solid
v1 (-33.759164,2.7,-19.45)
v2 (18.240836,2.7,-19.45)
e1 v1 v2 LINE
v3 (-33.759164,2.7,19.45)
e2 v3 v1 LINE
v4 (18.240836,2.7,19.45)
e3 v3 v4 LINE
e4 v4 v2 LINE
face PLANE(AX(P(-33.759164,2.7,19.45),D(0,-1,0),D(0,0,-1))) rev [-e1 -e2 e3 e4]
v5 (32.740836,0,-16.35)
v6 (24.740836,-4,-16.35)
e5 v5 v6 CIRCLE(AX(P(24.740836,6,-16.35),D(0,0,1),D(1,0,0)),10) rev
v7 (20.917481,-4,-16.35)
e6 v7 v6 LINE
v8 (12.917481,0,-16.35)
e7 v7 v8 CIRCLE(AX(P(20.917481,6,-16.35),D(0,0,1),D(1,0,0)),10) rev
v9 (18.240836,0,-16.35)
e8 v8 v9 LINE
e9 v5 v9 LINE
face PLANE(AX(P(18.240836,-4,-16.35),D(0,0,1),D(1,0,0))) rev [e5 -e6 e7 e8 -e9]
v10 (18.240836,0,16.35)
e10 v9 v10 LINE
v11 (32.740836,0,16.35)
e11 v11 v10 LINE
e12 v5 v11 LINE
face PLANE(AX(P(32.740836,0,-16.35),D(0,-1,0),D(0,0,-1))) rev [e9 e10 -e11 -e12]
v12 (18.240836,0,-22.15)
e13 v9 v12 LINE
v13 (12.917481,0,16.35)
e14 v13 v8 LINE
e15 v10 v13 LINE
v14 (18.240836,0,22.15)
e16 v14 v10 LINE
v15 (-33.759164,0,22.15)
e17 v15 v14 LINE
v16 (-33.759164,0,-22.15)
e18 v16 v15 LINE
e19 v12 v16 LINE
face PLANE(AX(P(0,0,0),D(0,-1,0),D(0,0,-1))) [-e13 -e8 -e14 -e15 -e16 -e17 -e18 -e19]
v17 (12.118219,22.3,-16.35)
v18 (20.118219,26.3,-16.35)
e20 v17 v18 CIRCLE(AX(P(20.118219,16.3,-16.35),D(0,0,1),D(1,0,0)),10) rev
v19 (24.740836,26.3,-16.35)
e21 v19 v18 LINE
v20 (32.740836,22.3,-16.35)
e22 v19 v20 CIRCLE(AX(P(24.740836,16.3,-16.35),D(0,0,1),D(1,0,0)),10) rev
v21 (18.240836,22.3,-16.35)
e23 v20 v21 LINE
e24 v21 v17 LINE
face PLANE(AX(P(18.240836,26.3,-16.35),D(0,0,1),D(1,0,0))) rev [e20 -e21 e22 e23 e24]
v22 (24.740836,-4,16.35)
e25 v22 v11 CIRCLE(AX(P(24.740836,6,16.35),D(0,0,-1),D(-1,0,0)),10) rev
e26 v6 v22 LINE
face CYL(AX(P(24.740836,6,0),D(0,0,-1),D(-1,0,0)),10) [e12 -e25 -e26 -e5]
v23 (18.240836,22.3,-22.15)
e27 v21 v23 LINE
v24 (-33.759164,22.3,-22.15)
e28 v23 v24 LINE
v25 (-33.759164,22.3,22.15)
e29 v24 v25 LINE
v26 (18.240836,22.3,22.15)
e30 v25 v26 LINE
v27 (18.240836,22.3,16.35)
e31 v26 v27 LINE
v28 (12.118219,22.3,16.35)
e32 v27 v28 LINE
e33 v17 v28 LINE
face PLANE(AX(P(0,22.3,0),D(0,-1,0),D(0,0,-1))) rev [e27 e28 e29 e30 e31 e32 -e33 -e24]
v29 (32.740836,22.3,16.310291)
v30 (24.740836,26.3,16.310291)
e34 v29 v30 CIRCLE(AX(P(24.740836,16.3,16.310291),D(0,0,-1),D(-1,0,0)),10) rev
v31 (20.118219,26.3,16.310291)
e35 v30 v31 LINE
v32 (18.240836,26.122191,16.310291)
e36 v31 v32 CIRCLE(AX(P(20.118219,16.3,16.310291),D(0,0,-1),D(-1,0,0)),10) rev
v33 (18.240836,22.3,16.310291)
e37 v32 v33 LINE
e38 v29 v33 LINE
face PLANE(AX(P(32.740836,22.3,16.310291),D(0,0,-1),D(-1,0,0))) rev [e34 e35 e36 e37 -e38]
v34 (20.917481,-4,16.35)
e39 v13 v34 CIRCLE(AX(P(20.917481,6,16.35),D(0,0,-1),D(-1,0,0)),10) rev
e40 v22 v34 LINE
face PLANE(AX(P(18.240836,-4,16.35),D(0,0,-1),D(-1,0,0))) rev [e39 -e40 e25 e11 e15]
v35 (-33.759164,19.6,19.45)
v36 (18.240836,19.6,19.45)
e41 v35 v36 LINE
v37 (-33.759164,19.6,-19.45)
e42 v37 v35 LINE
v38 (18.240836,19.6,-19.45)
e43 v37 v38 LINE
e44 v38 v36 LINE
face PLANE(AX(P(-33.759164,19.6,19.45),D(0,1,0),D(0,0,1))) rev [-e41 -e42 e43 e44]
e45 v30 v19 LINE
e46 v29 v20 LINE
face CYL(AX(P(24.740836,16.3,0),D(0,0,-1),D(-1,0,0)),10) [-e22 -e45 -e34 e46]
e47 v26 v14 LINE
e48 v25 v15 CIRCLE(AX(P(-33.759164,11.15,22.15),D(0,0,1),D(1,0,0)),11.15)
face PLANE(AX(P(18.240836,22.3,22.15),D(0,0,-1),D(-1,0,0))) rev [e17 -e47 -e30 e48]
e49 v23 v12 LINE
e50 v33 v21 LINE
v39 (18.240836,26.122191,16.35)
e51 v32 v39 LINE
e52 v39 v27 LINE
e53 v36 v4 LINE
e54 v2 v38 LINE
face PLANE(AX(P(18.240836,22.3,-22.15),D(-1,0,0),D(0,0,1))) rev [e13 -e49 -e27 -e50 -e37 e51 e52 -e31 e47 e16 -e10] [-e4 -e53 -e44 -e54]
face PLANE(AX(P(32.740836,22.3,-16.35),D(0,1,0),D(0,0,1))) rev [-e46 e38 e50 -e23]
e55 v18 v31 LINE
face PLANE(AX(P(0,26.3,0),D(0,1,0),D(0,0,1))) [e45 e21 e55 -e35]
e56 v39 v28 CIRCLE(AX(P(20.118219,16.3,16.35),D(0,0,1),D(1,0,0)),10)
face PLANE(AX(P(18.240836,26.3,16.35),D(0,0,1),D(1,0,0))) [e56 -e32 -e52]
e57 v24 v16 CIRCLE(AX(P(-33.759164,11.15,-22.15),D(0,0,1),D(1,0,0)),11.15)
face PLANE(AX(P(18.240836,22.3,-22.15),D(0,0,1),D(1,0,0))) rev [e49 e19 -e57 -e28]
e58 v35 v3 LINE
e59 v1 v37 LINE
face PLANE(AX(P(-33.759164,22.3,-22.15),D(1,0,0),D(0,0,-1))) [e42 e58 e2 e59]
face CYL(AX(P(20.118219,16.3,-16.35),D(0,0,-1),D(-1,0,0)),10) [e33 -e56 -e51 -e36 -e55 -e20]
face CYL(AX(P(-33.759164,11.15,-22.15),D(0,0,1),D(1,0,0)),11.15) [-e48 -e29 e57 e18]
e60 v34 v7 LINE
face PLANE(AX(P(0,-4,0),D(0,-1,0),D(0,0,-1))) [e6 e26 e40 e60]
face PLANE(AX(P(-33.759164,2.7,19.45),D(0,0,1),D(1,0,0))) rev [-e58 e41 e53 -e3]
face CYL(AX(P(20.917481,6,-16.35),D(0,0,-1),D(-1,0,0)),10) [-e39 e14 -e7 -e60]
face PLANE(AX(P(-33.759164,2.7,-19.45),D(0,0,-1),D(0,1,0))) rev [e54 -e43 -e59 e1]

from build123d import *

# Parameters (mm, degrees)
ESQUISSE1_W             = 52
ESQUISSE1_H             = 44.3
BOSS_EXTRU_1_DEPTH      = 22.3
ESQUISSE4_W             = 38.9
ESQUISSE4_H             = 16.9
ENL_V_MAT_EXTRU_2_DEPTH = 52
BOSS_EXTRU_3_DEPTH      = 44.3
ESQUISSE9_W             = 5.32335475
ESQUISSE9_H             = 32.7
BOSS_EXTRU_4_DEPTH      = 4
ESQUISSE10_W            = 32.7
ESQUISSE10_H            = 4
BOSS_EXTRU_5_DEPTH      = 14.5
ESQUISSE11_W            = 6.122616958
ESQUISSE11_H            = 32.7
BOSS_EXTRU_6_DEPTH      = 4
ESQUISSE12_W            = 32.660291113
ESQUISSE12_H            = 4
BOSS_EXTRU_7_DEPTH      = 14.5
CONG_1_R                = 10
CONG_2_R                = 10
CONG_3_R                = 10
CONG_4_R                = 10


with BuildPart() as part:
    # Esquisse1 → Boss.-Extru.1 (new body)
    with BuildSketch(Plane(origin=(0, 0, 0), x_dir=(1, 0, 0), z_dir=(0, 1, 0))):
        with Locations((-7.759163987, 0)):
            Rectangle(ESQUISSE1_W, ESQUISSE1_H)
    extrude(amount=BOSS_EXTRU_1_DEPTH)

    # Esquisse4 → Enlèv. mat.-Extru.2 (cut)
    with BuildSketch(Plane(origin=(18.240836013, 0, 0), x_dir=(0, 0, -1), z_dir=(1, 0, 0))):
        with Locations((0, 11.15)):
            Rectangle(ESQUISSE4_W, ESQUISSE4_H)
    extrude(amount=-ENL_V_MAT_EXTRU_2_DEPTH, mode=Mode.SUBTRACT)

    # Esquisse5 → Boss.-Extru.3 (add)
    with BuildSketch(Plane.XY.offset(22.15)):
        with BuildLine():
            Line((-33.759163987, 22.3), (-33.759163987, 0))
            ThreePointArc((-33.759163987, 0), (-44.909163987, 11.15), (-33.759163987, 22.3))
        make_face()
    extrude(amount=-BOSS_EXTRU_3_DEPTH)

    # Esquisse9 → Boss.-Extru.4 (add)
    with BuildSketch(Plane.XZ):
        with Locations((15.579158638, 0)):
            Rectangle(ESQUISSE9_W, ESQUISSE9_H)
    extrude(amount=BOSS_EXTRU_4_DEPTH)

    # Esquisse10 → Boss.-Extru.5 (add)
    with BuildSketch(Plane(origin=(18.240836013, 0, 0), x_dir=(0, 0, -1), z_dir=(1, 0, 0))):
        with Locations((0, -2)):
            Rectangle(ESQUISSE10_W, ESQUISSE10_H)
    extrude(amount=BOSS_EXTRU_5_DEPTH)

    # Esquisse11 → Boss.-Extru.6 (add)
    with BuildSketch(Plane(origin=(0, 22.3, 0), x_dir=(1, 0, 0), z_dir=(0, 1, 0))):
        with Locations((15.179527534, 0)):
            Rectangle(ESQUISSE11_W, ESQUISSE11_H)
    extrude(amount=BOSS_EXTRU_6_DEPTH)

    # Esquisse12 → Boss.-Extru.7 (add)
    with BuildSketch(Plane(origin=(18.240836013, 0, 0), x_dir=(0, 0, -1), z_dir=(1, 0, 0))):
        with Locations((0.019854443, 24.3)):
            Rectangle(ESQUISSE12_W, ESQUISSE12_H)
    extrude(amount=BOSS_EXTRU_7_DEPTH)

    # Congé1
    # the kernel refuses this fillet: 10 mm, written as the material it takes off along each edge
    with BuildSketch(Plane(origin=(12.917481263, -4, -36.35), x_dir=(1, 0, 0), z_dir=(0, 0, 1))) as cong_1_piece_1:
        with BuildLine():
            CenterArc((8, 10), CONG_1_R, 216.869897646, 53.130102354)
            Line((0, 4), (-0.16, 3.88))
            ThreePointArc((-0.16, 3.88), (-0.2, 2), (-0.2, 0))
            Line((-0.2, 0), (0, -0.2))
            Line((0, -0.2), (8, -0.2))
            Line((8, -0.2), (8, 0))
        make_face()
    extrude(amount=72.7, mode=Mode.SUBTRACT)

    # Congé2
    # the kernel refuses this fillet: 10 mm, written as the material it takes off along each edge
    with BuildSketch(Plane(origin=(12.118219055, 26.3, 36.35), x_dir=(1, 0, 0), z_dir=(0, 0, -1))) as cong_2_piece_1:
        with BuildLine():
            CenterArc((8, 10), CONG_2_R, 216.869897646, 53.130102354)
            Line((0, 4), (-0.16, 3.88))
            ThreePointArc((-0.16, 3.88), (-0.2, 2), (-0.2, 0))
            Line((-0.2, 0), (0, -0.2))
            Line((0, -0.2), (8, -0.2))
            Line((8, -0.2), (8, 0))
        make_face()
    extrude(amount=72.7, mode=Mode.SUBTRACT)

    # Congé3
    # the kernel refuses this fillet: 10 mm, written as the material it takes off along each edge
    with BuildSketch(Plane(origin=(32.740836013, -4, -36.35), x_dir=(-1, 0, 0), z_dir=(0, 0, 1))) as cong_3_piece_1:
        with BuildLine():
            CenterArc((8, -10), CONG_3_R, 90, 53.130102354)
            Line((0, -4), (-0.16, -3.88))
            ThreePointArc((-0.16, -3.88), (-0.2, -2), (-0.2, 0))
            Line((-0.2, 0), (0, 0.2))
            Line((0, 0.2), (8, 0.2))
            Line((8, 0.2), (8, 0))
        make_face()
    extrude(amount=72.7, mode=Mode.SUBTRACT)

    # Congé4
    # the kernel refuses this fillet: 10 mm, written as the material it takes off along each edge
    with BuildSketch(Plane(origin=(32.740836013, 26.3, -36.35), x_dir=(0, -1, 0), z_dir=(0, 0, 1))) as cong_4_piece_1:
        with BuildLine():
            CenterArc((10, -8), CONG_4_R, 126.869897646, 53.130102354)
            Line((0, -8), (-0.2, -8))
            Line((-0.2, -8), (-0.2, 0))
            Line((-0.2, 0), (0, 0.2))
            ThreePointArc((0, 0.2), (2, 0.2), (3.88, 0.16))
            Line((3.88, 0.16), (4, 0))
        make_face()
    extrude(amount=72.660291113, mode=Mode.SUBTRACT)


solid = part.part
